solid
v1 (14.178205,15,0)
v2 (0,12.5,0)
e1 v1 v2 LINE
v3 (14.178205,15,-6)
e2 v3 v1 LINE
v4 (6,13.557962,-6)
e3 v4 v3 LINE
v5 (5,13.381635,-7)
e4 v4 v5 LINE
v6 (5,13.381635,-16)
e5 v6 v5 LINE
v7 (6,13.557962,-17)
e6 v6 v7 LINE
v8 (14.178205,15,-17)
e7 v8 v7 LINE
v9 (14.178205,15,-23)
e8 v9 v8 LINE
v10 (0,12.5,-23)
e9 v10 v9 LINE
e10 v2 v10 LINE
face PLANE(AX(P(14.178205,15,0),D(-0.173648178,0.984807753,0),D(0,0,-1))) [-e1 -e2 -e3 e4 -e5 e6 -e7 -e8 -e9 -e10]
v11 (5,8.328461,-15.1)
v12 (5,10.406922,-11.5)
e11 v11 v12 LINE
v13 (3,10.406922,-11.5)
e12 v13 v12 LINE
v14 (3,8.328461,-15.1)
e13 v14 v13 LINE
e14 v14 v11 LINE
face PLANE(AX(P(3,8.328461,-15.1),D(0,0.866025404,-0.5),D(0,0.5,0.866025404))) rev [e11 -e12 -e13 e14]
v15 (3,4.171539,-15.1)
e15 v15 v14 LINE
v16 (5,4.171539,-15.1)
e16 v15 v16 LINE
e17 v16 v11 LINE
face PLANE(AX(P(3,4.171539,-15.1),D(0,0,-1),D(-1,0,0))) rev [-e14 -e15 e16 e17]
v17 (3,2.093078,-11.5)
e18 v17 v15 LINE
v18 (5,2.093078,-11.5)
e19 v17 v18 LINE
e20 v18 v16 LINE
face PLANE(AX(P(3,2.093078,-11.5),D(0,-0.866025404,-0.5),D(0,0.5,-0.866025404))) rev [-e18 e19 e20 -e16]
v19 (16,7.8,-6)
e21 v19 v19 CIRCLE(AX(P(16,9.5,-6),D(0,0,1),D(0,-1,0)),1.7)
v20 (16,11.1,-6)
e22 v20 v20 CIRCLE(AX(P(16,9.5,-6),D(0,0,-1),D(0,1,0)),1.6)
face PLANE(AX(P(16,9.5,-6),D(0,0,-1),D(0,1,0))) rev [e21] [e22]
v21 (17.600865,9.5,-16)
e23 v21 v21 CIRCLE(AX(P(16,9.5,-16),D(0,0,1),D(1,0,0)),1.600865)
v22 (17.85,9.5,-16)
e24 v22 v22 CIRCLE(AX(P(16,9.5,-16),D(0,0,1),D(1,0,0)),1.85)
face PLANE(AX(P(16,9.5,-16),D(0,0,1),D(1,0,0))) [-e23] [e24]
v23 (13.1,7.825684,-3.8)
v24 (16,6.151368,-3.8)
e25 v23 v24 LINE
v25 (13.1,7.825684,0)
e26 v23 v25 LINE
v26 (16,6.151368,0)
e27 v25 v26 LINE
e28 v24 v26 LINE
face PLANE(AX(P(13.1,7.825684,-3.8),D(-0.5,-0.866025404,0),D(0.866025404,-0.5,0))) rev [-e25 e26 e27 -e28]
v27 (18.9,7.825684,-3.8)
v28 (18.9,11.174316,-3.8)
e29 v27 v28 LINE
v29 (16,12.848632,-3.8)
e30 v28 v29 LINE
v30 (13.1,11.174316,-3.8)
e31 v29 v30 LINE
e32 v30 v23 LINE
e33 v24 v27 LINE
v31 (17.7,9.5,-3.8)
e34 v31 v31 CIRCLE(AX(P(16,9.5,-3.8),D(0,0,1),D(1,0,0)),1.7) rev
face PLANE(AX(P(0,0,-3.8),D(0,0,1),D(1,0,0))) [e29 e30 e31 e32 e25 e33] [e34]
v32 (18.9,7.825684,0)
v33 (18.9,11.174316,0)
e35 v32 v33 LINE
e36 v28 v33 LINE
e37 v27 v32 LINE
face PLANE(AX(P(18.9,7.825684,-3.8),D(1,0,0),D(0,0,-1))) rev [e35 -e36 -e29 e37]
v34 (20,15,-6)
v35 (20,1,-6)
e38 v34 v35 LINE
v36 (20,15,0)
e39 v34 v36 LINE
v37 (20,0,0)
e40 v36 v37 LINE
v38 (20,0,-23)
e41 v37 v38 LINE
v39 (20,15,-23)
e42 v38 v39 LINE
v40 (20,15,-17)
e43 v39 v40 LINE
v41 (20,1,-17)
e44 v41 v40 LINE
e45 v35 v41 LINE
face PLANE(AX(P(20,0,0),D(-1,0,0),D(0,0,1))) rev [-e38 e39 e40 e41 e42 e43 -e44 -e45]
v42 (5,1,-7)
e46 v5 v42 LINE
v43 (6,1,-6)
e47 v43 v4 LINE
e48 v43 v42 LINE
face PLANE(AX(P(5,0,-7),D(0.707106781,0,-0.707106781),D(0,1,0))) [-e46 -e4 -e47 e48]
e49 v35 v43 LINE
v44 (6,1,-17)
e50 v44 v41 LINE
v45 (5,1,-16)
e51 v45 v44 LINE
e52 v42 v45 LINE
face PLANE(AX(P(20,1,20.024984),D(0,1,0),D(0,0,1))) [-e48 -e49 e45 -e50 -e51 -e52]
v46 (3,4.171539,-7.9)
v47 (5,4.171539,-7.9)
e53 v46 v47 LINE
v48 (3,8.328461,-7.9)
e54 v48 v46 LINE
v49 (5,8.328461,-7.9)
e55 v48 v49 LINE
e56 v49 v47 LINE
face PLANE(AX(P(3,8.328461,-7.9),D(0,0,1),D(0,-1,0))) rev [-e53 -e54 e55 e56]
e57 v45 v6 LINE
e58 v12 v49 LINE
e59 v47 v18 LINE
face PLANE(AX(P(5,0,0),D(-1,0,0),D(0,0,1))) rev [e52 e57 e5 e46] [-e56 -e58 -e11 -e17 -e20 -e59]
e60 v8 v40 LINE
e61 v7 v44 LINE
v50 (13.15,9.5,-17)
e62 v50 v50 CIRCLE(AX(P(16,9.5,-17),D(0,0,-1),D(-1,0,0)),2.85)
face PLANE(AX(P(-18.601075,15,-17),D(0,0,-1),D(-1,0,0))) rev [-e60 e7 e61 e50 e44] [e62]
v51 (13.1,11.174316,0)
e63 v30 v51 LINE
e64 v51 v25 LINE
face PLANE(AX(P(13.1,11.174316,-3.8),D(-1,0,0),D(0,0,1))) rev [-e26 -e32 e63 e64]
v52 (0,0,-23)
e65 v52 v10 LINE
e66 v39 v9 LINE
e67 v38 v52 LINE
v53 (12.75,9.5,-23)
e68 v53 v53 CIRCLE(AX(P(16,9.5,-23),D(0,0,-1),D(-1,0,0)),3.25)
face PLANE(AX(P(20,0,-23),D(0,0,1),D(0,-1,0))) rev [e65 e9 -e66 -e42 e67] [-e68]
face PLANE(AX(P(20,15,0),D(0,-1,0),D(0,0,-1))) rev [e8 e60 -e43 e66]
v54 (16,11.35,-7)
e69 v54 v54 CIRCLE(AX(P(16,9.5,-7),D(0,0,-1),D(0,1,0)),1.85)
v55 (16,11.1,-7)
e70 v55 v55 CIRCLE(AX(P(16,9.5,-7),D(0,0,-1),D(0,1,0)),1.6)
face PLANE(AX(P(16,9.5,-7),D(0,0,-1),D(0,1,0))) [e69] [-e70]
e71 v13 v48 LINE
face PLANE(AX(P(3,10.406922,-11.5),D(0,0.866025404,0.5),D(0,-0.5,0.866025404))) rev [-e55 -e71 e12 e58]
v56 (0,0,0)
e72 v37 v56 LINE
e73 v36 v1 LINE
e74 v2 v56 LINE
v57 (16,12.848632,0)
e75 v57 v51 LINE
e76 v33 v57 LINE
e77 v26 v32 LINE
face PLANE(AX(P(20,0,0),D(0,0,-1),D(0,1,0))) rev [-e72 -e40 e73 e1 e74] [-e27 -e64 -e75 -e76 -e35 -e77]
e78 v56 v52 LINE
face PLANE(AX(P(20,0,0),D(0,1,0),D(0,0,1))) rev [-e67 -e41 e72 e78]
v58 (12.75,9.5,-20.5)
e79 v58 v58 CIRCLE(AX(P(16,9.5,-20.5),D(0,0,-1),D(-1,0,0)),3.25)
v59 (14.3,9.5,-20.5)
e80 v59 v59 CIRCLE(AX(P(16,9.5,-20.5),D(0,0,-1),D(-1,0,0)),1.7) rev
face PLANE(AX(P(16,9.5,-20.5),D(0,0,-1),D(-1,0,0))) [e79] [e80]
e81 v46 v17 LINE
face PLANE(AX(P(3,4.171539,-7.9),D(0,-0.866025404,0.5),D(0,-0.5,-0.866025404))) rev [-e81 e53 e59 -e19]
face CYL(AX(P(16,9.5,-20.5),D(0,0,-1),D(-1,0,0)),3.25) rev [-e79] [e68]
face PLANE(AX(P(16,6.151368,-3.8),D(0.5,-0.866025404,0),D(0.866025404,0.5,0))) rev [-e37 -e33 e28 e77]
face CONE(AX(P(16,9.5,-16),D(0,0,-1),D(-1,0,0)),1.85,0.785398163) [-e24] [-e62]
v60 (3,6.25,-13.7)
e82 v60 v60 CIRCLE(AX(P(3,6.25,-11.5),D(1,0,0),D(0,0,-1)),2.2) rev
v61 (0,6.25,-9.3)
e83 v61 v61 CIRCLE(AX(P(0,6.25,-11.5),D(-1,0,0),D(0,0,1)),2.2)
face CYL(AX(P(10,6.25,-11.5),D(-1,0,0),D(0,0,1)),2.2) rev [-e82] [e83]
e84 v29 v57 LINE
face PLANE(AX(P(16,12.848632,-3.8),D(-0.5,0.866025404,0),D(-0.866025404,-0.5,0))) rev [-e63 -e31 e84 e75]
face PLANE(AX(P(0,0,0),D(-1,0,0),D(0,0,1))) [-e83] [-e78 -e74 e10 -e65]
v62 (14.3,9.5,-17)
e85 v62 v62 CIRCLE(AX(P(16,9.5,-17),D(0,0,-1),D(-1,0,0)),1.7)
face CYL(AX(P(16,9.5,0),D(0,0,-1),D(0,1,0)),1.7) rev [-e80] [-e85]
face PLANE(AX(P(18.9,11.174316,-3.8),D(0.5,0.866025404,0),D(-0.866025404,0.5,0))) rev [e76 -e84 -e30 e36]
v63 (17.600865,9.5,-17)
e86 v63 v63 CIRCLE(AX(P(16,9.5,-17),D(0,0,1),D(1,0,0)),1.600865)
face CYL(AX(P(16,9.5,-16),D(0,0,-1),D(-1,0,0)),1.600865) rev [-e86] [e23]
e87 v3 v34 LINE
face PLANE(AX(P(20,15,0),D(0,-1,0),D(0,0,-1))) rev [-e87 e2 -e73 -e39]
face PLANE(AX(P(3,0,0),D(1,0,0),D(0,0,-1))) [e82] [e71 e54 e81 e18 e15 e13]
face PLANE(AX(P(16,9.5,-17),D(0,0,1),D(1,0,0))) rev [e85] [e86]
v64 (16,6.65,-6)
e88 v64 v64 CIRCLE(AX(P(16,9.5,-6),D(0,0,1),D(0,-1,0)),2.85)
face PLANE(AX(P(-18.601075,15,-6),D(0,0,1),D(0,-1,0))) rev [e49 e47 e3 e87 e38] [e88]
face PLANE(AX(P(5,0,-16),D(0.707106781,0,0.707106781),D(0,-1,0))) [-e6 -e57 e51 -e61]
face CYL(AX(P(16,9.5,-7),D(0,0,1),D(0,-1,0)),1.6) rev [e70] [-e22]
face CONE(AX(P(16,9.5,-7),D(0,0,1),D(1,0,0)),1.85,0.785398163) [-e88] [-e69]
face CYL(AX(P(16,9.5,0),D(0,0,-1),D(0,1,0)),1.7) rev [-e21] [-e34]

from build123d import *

# Parameters (mm, degrees)
SKETCH1_W               = 23
SKETCH1_H               = 15
BOSS_EXTRUDE1_DEPTH     = 20
SKETCH2_W               = 11
SKETCH2_H               = 15
CUT_EXTRUDE1_DEPTH      = 15
CUT_EXTRUDE2_DEPTH      = 34.970575503
CUT_EXTRUDE2_DEPTH_BACK = 34.970575503
SKETCH3_R               = 1.7
CHAMFER1_SIZE           = 2.5
CHAMFER1_SIZE_2         = 14.178204549
SKETCH4_R               = 2.2
CUT_EXTRUDE3_DEPTH      = 10
CUT_EXTRUDE4_DEPTH      = 2
SKETCH6_R               = 3.25
CUT_EXTRUDE5_DEPTH      = 2.5
CUT_EXTRUDE6_DEPTH      = 3.8
CHAMFER3_SIZE           = 1
SKETCH9_R               = 1.85
SKETCH9_R_2             = 1.6
BOSS_EXTRUDE2_DEPTH     = 1
BOSS_EXTRUDE3_START     = 1
SKETCH8_R               = 1.85
SKETCH8_R_2             = 1.600864578
BOSS_EXTRUDE3_DEPTH     = 1
CHAMFER4_SIZE           = 1
BOSS_EXTRUDE4_START     = -17
SKETCH10_W              = 20
SKETCH10_H              = 1
BOSS_EXTRUDE4_DEPTH     = 11


# Some blends are built 0.0001 mm under size
with BuildPart() as part:
    # Sketch1 → Boss-Extrude1 (new body)
    with BuildSketch(Plane(origin=(0, 0, 0), x_dir=(0, 0, -1), z_dir=(1, 0, 0))):
        with Locations((11.5, 7.5)):
            Rectangle(SKETCH1_W, SKETCH1_H)
    extrude(amount=BOSS_EXTRUDE1_DEPTH)

    # Sketch2 → Cut-Extrude1 (cut)
    with BuildSketch(Plane(origin=(20, 0, 0), x_dir=(0, 0, -1), z_dir=(1, 0, 0))):
        with Locations((11.5, 7.5)):
            Rectangle(SKETCH2_W, SKETCH2_H)
    extrude(amount=-CUT_EXTRUDE1_DEPTH, mode=Mode.SUBTRACT)

    # Sketch3 → Cut-Extrude2 (cut, two sides: drawn at the far end of the back side and taken through both)
    with BuildSketch(Plane(origin=(0, 0, -23), x_dir=(-1, 0, 0), z_dir=(0, 0, -1)).offset(-CUT_EXTRUDE2_DEPTH_BACK)):
        with Locations(Location((-16, 9.5, 0), (0, 0, 90))):
            Circle(SKETCH3_R)
    extrude(amount=CUT_EXTRUDE2_DEPTH + CUT_EXTRUDE2_DEPTH_BACK, mode=Mode.SUBTRACT)

    # Chamfer1
    # the kernel refuses this chamfer: 14.178204549, 2.5 mm, written as the material it takes off along each edge
    with BuildSketch(Plane(origin=(0, 15, -59.842614584), x_dir=(-0.21013876076743537, -0.9776715712462578, 0), z_dir=(0, 0, 1))) as chamfer1_piece_1:
        Polygon((CHAMFER1_SIZE * 0.977671571246, CHAMFER1_SIZE * 0.210138760767), (-CHAMFER1_SIZE_2 * 0.210138760768, CHAMFER1_SIZE_2 * 0.977671571249), (0, 0), align=None)
    extrude(amount=96.685229169, mode=Mode.SUBTRACT)

    # Sketch4 → Cut-Extrude3 (cut)
    with BuildSketch(Plane.ZY):
        with Locations((-11.5, 6.25)):
            Circle(SKETCH4_R)
    extrude(amount=-CUT_EXTRUDE3_DEPTH, mode=Mode.SUBTRACT)

    # Sketch5 → Cut-Extrude4 (cut)
    with BuildSketch(Plane(origin=(5, 0, 0), x_dir=(0, 0, -1), z_dir=(1, 0, 0))):
        Polygon((7.9, 8.328460969), (7.9, 4.171539031), (11.5, 2.093078062), (15.1, 4.171539031), (15.1, 8.328460969), (11.5, 10.406921938), align=None)
    extrude(amount=-CUT_EXTRUDE4_DEPTH, mode=Mode.SUBTRACT)

    # Sketch6 → Cut-Extrude5 (cut)
    with BuildSketch(Plane(origin=(0, 0, -23), x_dir=(-1, 0, 0), z_dir=(0, 0, -1))):
        with Locations((-16, 9.5)):
            Circle(SKETCH6_R)
    extrude(amount=-CUT_EXTRUDE5_DEPTH, mode=Mode.SUBTRACT)

    # Sketch7 → Cut-Extrude6 (cut)
    with BuildSketch(Plane.XY):
        Polygon((13.1, 11.174315781), (13.1, 7.825684219), (16, 6.151368439), (18.9, 7.825684219), (18.9, 11.174315781), (16, 12.848631561), align=None)
    extrude(amount=-CUT_EXTRUDE6_DEPTH, mode=Mode.SUBTRACT)

    # Chamfer3
    chamfer3_edges = [part.edges().sort_by_distance(p)[0] for p in [
        (5, 6.690817452, -17),
        (5, 6.690817452, -6),
    ]]
    chamfer(chamfer3_edges, length=CHAMFER3_SIZE)

    # Sketch9 → Boss-Extrude2 (add)
    with BuildSketch(Plane(origin=(0, 0, -6), x_dir=(-1, 0, 0), z_dir=(0, 0, -1))):
        with Locations(Location((-16, 9.5, 0), (0, 0, 270))):
            Circle(SKETCH9_R)
        with Locations(Location((-16, 9.5, 0), (0, 0, 90))):
            Circle(SKETCH9_R_2, mode=Mode.SUBTRACT)
    extrude(amount=BOSS_EXTRUDE2_DEPTH)

    # Sketch8 → Boss-Extrude3 (add)
    with BuildSketch(Plane.XY.offset(-17).offset(BOSS_EXTRUDE3_START)):
        with Locations(Location((16, 9.5, 0), (0, 0, 270))):
            Circle(SKETCH8_R)
        with Locations((16, 9.5)):
            Circle(SKETCH8_R_2, mode=Mode.SUBTRACT)
    extrude(amount=-BOSS_EXTRUDE3_DEPTH)

    # Chamfer4
    chamfer4_edges = [part.edges().sort_by_distance(p)[0] for p in [
        (16, 11.35, -6),
        (16, 11.35, -17),
    ]]
    chamfer(chamfer4_edges, length=CHAMFER4_SIZE - 0.0001)  # a hair under: the kernel refuses the full size

    # Sketch10 → Boss-Extrude4 (add)
    with BuildSketch(Plane(origin=(0, 0, -23), x_dir=(-1, 0, 0), z_dir=(0, 0, -1)).offset(BOSS_EXTRUDE4_START)):
        with Locations((-10, 0.5)):
            Rectangle(SKETCH10_W, SKETCH10_H)
    extrude(amount=BOSS_EXTRUDE4_DEPTH)


solid = part.part
